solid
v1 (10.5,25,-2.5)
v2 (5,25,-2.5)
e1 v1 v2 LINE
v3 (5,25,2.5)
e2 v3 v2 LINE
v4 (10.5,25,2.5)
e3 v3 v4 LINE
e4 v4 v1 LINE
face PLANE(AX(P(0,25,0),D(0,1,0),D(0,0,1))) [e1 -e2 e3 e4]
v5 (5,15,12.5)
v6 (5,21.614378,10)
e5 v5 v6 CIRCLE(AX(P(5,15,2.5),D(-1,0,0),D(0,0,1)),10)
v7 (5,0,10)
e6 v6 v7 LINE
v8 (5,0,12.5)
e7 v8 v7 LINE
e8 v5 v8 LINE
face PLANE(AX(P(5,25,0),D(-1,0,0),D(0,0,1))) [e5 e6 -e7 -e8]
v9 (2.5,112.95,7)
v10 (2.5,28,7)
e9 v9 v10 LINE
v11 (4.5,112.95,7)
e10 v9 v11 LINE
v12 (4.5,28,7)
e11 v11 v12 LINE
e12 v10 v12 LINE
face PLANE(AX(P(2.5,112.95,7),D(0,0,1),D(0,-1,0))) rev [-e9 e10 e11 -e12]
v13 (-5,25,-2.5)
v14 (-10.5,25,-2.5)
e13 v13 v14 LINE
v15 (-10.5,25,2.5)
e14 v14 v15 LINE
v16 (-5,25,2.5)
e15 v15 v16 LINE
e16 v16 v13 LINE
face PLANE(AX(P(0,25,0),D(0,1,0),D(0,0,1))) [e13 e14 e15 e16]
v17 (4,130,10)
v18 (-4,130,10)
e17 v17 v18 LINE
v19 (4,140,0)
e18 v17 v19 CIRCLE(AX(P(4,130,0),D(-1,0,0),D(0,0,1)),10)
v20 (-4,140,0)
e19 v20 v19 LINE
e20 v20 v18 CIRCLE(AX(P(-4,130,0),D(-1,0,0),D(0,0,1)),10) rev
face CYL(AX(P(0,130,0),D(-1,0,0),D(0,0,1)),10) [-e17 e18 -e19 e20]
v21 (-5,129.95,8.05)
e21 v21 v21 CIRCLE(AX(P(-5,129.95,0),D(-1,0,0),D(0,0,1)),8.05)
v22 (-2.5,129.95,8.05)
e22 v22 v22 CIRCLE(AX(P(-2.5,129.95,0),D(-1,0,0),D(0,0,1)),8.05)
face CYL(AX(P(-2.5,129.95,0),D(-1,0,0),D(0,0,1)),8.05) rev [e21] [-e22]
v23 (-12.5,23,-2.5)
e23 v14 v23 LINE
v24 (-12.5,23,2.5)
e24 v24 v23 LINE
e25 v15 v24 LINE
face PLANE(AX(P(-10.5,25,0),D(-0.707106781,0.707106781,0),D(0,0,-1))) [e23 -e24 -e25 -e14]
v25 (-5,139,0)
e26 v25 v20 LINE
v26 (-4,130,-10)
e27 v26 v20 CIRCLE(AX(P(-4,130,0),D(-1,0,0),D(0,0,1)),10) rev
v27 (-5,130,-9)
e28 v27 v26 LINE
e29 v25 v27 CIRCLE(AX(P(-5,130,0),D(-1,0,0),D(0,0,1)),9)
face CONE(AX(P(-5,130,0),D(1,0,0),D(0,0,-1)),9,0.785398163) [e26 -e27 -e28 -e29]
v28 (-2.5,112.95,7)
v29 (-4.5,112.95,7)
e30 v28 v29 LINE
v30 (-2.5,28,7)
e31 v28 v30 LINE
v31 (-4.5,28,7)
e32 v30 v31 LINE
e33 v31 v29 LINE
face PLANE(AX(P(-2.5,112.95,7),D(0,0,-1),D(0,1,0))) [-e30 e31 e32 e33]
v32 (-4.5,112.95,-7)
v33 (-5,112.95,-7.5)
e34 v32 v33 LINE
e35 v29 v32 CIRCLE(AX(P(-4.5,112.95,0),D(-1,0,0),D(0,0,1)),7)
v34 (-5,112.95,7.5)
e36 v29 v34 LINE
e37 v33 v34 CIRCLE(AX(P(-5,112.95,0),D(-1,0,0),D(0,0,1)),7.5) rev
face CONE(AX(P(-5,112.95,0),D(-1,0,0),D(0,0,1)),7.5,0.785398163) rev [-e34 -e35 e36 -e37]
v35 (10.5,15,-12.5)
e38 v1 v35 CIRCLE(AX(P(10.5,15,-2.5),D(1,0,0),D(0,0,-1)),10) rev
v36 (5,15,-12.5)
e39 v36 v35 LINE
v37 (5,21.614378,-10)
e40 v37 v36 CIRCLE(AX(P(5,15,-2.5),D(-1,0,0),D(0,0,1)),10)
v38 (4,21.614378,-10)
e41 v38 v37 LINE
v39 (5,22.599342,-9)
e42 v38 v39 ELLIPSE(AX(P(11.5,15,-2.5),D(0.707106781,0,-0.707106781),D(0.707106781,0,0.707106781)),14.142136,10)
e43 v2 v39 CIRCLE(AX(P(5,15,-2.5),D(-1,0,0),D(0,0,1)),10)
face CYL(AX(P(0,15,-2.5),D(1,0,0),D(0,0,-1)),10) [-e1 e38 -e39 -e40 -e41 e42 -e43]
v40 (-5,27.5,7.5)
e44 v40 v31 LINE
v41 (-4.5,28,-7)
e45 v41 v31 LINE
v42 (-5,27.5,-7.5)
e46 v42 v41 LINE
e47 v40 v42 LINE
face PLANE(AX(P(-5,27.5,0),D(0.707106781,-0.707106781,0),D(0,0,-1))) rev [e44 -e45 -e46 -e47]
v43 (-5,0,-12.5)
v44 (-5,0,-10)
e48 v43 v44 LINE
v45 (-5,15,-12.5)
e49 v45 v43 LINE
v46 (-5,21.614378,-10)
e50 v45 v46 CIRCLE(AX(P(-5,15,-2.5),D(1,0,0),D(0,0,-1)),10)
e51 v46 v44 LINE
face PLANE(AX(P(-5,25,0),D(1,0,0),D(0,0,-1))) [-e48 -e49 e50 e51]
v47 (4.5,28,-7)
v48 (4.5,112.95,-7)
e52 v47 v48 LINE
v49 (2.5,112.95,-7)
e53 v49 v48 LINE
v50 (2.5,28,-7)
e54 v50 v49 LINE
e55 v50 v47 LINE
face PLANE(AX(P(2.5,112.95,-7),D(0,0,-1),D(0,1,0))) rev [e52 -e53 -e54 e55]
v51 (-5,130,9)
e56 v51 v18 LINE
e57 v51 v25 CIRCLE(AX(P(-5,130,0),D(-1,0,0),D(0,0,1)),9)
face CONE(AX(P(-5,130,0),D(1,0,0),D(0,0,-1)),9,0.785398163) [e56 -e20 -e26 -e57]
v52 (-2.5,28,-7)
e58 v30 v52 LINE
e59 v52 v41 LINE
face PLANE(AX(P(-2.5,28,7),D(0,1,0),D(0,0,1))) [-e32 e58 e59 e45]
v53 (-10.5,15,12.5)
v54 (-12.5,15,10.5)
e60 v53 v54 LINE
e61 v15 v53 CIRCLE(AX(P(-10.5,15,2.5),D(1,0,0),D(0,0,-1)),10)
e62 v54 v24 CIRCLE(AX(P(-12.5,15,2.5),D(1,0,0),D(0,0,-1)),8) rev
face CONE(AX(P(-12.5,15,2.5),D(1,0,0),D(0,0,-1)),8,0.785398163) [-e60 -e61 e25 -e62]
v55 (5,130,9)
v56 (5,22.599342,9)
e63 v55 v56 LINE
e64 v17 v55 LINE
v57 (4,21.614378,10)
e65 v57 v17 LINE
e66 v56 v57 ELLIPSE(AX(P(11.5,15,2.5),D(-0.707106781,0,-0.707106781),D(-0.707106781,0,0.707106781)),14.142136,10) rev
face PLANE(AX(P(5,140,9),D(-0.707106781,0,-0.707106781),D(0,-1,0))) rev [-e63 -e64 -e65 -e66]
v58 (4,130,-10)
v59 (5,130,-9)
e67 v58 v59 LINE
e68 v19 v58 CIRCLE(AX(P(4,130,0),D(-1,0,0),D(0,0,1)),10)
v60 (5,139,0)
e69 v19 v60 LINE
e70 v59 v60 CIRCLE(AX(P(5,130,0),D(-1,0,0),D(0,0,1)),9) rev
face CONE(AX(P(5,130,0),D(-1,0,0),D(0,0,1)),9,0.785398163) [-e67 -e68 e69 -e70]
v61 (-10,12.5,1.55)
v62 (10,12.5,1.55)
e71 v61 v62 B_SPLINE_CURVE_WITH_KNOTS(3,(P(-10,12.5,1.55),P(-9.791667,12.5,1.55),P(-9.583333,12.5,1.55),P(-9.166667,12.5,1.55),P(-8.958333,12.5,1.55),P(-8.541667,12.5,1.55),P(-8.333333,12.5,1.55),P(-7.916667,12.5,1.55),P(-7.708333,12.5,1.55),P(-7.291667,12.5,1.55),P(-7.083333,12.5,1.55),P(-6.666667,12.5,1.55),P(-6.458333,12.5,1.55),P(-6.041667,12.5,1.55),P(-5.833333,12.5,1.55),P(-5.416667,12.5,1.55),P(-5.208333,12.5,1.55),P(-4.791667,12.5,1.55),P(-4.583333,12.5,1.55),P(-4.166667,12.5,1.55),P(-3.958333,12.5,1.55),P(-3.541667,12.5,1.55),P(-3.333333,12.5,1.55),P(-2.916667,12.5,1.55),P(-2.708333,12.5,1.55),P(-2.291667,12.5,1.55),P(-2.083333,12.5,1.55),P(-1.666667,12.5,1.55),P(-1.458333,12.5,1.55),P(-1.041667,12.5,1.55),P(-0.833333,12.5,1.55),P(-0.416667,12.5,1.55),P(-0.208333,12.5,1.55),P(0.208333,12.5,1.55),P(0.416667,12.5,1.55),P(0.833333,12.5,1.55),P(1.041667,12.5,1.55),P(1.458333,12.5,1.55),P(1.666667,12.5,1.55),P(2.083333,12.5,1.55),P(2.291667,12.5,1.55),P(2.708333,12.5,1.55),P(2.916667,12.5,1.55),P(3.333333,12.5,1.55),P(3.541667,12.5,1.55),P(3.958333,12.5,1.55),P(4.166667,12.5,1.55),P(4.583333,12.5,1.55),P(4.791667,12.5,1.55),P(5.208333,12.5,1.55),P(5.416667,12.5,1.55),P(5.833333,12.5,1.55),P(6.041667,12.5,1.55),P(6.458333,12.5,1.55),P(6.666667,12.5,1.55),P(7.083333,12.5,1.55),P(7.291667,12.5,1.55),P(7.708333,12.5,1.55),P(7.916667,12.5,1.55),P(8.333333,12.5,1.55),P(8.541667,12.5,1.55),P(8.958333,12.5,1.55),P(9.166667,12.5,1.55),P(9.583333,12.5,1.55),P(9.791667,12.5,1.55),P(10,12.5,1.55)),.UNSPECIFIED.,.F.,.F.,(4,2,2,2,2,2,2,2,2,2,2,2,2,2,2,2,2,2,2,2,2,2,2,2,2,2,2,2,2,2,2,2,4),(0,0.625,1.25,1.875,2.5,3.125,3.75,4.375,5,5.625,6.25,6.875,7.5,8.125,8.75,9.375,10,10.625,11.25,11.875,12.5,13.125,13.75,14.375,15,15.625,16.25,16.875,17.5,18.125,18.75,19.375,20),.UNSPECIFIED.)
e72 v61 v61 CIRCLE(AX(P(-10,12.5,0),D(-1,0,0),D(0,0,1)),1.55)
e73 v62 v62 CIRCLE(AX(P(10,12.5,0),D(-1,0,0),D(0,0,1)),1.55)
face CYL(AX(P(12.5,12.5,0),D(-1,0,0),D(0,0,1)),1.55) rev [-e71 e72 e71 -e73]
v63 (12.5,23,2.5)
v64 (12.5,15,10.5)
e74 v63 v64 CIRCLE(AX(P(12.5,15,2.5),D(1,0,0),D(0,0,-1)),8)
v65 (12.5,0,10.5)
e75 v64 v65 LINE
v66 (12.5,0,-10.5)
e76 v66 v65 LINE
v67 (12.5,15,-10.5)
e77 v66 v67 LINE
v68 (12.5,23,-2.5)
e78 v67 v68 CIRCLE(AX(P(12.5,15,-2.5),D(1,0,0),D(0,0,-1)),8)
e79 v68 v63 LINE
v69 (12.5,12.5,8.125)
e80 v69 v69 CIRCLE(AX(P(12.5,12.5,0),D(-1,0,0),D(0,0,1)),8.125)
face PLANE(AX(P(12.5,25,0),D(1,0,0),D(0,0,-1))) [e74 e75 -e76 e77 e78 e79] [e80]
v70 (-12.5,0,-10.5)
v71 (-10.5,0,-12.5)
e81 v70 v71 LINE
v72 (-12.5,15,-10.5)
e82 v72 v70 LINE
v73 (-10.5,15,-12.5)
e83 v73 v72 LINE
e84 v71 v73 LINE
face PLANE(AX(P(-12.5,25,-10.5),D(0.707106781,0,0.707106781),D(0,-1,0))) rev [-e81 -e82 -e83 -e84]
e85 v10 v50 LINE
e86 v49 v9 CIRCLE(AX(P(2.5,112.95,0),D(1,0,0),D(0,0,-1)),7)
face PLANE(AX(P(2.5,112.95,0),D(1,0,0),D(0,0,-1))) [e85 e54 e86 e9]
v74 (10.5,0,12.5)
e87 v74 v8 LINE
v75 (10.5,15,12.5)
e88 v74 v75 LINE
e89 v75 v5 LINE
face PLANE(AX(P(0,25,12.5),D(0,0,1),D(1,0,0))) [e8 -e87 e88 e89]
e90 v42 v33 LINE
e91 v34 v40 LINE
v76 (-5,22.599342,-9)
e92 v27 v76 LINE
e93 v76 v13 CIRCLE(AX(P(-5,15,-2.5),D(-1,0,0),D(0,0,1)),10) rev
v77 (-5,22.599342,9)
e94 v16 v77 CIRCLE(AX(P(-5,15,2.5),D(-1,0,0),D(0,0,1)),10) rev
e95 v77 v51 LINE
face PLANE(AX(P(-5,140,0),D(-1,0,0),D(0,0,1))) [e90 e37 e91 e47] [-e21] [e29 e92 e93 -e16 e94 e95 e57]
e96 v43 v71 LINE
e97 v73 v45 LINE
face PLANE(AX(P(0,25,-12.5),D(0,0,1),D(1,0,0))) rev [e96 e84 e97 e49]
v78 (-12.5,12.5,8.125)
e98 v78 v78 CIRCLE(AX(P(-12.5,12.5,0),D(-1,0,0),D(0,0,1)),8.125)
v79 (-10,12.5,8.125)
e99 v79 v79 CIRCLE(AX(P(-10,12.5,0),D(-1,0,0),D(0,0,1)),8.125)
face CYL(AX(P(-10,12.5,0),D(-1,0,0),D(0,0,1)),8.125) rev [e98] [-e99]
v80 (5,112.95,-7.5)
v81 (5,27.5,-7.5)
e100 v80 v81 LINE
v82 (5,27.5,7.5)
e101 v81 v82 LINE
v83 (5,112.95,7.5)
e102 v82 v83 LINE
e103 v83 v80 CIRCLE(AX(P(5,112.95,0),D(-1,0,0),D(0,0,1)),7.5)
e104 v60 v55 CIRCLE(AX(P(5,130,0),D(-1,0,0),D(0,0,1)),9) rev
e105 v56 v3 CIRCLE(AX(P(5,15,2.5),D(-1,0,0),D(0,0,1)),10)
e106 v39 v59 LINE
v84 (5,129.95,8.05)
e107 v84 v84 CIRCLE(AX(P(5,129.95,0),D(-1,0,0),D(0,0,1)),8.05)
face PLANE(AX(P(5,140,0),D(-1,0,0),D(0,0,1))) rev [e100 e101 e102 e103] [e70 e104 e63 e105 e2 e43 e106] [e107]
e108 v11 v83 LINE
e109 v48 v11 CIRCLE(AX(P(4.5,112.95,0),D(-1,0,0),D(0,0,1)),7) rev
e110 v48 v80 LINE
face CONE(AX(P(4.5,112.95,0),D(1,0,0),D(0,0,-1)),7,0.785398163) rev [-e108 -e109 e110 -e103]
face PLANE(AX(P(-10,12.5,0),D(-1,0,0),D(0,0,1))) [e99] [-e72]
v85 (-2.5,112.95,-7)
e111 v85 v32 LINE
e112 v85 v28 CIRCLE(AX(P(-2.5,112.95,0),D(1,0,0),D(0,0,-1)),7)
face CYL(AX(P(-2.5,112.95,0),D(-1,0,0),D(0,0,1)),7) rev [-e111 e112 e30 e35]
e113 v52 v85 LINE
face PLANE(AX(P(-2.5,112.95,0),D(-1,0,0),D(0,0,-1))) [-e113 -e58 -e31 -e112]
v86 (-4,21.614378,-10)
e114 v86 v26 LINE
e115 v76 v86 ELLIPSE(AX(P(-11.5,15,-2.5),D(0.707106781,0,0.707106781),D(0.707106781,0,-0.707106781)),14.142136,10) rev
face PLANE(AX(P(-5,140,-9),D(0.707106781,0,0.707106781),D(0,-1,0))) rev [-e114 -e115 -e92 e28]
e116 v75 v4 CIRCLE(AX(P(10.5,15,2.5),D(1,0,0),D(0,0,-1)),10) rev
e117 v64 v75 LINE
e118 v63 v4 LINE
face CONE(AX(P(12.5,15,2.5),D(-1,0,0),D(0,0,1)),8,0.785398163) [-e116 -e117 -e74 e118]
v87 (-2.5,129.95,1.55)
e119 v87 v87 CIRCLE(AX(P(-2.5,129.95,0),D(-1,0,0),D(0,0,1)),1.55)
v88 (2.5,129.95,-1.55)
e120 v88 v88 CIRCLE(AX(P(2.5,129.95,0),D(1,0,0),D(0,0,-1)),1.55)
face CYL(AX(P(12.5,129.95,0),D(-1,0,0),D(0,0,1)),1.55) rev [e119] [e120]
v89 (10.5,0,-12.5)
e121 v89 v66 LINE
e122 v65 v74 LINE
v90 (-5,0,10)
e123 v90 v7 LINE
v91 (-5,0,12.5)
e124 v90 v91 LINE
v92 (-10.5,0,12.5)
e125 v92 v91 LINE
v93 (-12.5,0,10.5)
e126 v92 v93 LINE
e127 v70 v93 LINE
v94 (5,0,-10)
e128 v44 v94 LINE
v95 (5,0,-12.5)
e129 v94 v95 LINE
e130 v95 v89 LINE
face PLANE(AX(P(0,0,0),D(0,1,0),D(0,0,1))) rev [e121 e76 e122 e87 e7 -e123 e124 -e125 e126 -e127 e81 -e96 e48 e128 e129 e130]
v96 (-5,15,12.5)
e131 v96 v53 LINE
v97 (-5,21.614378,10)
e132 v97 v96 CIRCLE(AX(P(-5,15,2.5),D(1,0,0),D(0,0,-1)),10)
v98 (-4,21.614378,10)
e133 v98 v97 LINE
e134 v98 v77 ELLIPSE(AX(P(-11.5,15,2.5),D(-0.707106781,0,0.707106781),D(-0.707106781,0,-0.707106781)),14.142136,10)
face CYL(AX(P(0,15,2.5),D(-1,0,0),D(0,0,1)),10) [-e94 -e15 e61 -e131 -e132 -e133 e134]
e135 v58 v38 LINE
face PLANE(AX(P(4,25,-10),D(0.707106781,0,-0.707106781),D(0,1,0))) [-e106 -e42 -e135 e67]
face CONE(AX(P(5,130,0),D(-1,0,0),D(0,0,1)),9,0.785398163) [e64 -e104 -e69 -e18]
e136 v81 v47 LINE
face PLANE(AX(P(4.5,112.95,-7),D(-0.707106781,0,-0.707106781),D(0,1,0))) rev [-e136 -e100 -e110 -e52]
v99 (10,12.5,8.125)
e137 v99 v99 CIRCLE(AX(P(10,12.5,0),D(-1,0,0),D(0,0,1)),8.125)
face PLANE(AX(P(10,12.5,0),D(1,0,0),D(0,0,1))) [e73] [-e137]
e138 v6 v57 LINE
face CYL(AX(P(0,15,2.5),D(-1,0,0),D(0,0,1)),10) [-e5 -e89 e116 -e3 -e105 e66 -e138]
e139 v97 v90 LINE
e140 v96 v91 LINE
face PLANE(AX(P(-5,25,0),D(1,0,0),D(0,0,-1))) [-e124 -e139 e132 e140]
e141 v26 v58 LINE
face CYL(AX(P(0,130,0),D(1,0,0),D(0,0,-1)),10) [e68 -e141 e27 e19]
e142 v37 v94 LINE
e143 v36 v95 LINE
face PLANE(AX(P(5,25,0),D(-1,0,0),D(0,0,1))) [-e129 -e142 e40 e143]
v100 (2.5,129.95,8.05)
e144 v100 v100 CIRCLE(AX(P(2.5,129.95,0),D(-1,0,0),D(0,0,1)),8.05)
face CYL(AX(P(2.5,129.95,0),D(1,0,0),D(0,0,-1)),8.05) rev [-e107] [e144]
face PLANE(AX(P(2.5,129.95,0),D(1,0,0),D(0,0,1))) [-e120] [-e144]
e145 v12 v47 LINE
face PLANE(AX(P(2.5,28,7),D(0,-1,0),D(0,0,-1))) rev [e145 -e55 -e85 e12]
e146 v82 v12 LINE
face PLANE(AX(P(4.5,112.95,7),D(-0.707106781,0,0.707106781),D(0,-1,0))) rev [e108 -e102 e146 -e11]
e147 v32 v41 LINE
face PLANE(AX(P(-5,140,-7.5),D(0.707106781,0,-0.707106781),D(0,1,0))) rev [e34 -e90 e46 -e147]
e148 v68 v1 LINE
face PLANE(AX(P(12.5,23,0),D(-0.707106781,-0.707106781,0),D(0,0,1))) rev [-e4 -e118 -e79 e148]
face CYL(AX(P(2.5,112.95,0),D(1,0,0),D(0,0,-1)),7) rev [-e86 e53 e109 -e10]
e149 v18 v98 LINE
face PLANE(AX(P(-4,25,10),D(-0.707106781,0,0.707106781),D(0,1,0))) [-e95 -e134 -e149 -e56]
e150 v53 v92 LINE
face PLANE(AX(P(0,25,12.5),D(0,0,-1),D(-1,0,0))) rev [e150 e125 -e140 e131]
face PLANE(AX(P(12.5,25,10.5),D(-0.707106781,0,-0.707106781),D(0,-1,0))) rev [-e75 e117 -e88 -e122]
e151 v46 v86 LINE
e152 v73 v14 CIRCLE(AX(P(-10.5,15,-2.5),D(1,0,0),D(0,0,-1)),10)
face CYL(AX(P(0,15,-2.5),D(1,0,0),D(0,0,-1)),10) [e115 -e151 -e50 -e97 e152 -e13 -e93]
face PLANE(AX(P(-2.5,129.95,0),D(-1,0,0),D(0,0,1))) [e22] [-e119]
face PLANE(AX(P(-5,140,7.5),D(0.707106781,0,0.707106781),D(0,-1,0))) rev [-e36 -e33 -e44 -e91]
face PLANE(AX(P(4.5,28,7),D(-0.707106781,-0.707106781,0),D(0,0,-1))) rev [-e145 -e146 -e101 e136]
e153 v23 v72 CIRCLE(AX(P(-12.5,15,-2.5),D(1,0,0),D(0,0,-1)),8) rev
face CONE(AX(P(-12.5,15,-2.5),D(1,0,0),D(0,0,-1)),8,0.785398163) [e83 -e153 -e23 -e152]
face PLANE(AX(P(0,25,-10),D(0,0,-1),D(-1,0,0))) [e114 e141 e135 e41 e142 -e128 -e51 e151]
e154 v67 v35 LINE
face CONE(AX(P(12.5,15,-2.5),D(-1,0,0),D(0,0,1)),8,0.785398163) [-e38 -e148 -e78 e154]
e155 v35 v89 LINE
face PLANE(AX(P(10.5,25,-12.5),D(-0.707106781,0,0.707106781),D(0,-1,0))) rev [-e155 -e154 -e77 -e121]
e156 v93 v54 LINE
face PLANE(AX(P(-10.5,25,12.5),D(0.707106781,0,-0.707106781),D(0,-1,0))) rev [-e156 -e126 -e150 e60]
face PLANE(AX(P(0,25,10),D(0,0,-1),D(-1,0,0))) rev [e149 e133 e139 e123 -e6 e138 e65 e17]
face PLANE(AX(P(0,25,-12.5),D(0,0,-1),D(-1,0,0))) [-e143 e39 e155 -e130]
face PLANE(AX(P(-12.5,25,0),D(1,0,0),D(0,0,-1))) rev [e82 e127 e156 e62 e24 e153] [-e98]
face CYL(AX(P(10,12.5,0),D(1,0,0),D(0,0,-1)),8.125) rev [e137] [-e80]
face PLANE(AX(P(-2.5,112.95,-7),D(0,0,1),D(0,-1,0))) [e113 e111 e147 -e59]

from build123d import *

# Parameters (mm, degrees)
BASE_W              = 10
BASE_H              = 20
BOSS_EXTRUDE1_DEPTH = 25
SKETCH2_R           = 8.125
SKETCH2_R_2         = 1.55
CUT_EXTRUDE1_DEPTH  = 2.5
SKETCH2_2_R         = 1.55
CUT_EXTRUDE2_DEPTH  = 38.5
BOSS_EXTRUDE2_START = 25
BASE_3_W            = 10
BASE_3_H            = 20
BOSS_EXTRUDE2_DEPTH = 115
BEARING_R           = 8.05
BEARING_R_2         = 1.55
CUT_EXTRUDE3_DEPTH  = 2.5
FILLET1_R           = 10
CHAMFER1_SIZE       = 2
CUT_EXTRUDE5_DEPTH  = 2.5
BEARING_2_R         = 1.55
CUT_EXTRUDE6_DEPTH  = 142.642154742
CHAMFER2_SIZE       = 1
CHAMFER3_SIZE       = 0.5


with BuildPart() as part:
    # Base → Boss-Extrude1 (new body)
    with BuildSketch(Plane(origin=(0, 0, 0), x_dir=(1, 0, 0), z_dir=(0, 1, 0))):
        Polygon((5, -12.5), (5, -10), (5, 10), (5, 12.5), (12.5, 12.5), (12.5, -12.5), align=None)
        Rectangle(BASE_W, BASE_H)
        Polygon((-5, 10), (-5, -10), (-5, -12.5), (-12.5, -12.5), (-12.5, 12.5), (-5, 12.5), align=None)
    extrude(amount=BOSS_EXTRUDE1_DEPTH)

    # Sketch2 → Cut-Extrude1 (cut)
    with BuildSketch(Plane.ZY.offset(12.5)):
        with Locations((0, 12.5)):
            Circle(SKETCH2_R)
        with Locations((0, 12.5)):
            Circle(SKETCH2_R_2, mode=Mode.SUBTRACT)
    cut_extrude1 = extrude(amount=-CUT_EXTRUDE1_DEPTH, mode=Mode.SUBTRACT)

    # Sketch2<2> → Cut-Extrude2 (cut, through all)
    with BuildSketch(Plane.ZY.offset(12.5)):
        with Locations((0, 12.5)):
            Circle(SKETCH2_2_R)
    extrude(amount=-CUT_EXTRUDE2_DEPTH, mode=Mode.SUBTRACT)

    # Base<3> → Boss-Extrude2 (add)
    with BuildSketch(Plane(origin=(0, 0, 0), x_dir=(1, 0, 0), z_dir=(0, 1, 0)).offset(BOSS_EXTRUDE2_START)):
        Rectangle(BASE_3_W, BASE_3_H)
    extrude(amount=BOSS_EXTRUDE2_DEPTH)

    # Mirror1: Cut-Extrude1 across plane
    add(cut_extrude1.mirror(Plane.ZY), mode=Mode.SUBTRACT)

    # Bearing → Cut-Extrude3 (cut)
    with BuildSketch(Plane.ZY.offset(5)):
        with Locations((0, 129.95)):
            Circle(BEARING_R)
        with Locations((0, 129.95)):
            Circle(BEARING_R_2, mode=Mode.SUBTRACT)
    cut_extrude3 = extrude(amount=-CUT_EXTRUDE3_DEPTH, mode=Mode.SUBTRACT)

    # Fillet1
    # the kernel refuses this fillet: 10 mm, written as the material it takes off along each edge
    with BuildSketch(Plane(origin=(37.5, 25, 12.5), x_dir=(0, -1, 0), z_dir=(-1, 0, 0)), Plane(origin=(5, 25, -12.5), x_dir=(0, -1, 0), z_dir=(1, 0, 0))) as fillet1_piece_1:
        with BuildLine():
            CenterArc((FILLET1_R, -FILLET1_R), FILLET1_R, 90, 90)
            Line((0, -FILLET1_R), (0, 0))
            Line((0, 0), (FILLET1_R, 0))
        make_face()
    extrude(amount=32.5, mode=Mode.SUBTRACT)
    with BuildSketch(Plane(origin=(37.5, 25, 12.5), x_dir=(0, -1, 0), z_dir=(-1, 0, 0))) as fillet1_piece_2_section:
        with BuildLine():
            CenterArc((FILLET1_R, -FILLET1_R), FILLET1_R, 90, 90)
            Line((0, -FILLET1_R), (0, 0))
            Line((0, 0), (FILLET1_R, 0))
        make_face()
    fillet1_piece_2 = extrude(amount=57.5, mode=Mode.PRIVATE)
    fillet1_piece_2 = split(fillet1_piece_2, bisect_by=Plane(origin=(-5, 22.736048857, 10.236048857), z_dir=(-1, 0, 0)), keep=Keep.TOP, mode=Mode.PRIVATE)
    add(fillet1_piece_2, mode=Mode.SUBTRACT)
    with BuildSketch(Plane(origin=(-20, 25, -12.5), x_dir=(0, -1, 0), z_dir=(1, 0, 0))) as fillet1_piece_3_section:
        with BuildLine():
            CenterArc((FILLET1_R, -FILLET1_R), FILLET1_R, 90, 90)
            Line((0, -FILLET1_R), (0, 0))
            Line((0, 0), (FILLET1_R, 0))
        make_face()
    fillet1_piece_3 = extrude(amount=57.5, mode=Mode.PRIVATE)
    fillet1_piece_3 = split(fillet1_piece_3, bisect_by=Plane(origin=(-5, 22.736048857, -10.236048857), z_dir=(-1, 0, 0)), keep=Keep.TOP, mode=Mode.PRIVATE)
    add(fillet1_piece_3, mode=Mode.SUBTRACT)
    with BuildSketch(Plane(origin=(-37.5, 25, -12.5), x_dir=(0, 0, 1), z_dir=(1, 0, 0)), Plane(origin=(-5, 25, 12.5), x_dir=(0, 0, -1), z_dir=(-1, 0, 0))) as fillet1_piece_4:
        with BuildLine():
            CenterArc((FILLET1_R, FILLET1_R), FILLET1_R, 180, 90)
            Line((0, FILLET1_R), (0, 0))
            Line((0, 0), (FILLET1_R, 0))
        make_face()
    extrude(amount=32.5, mode=Mode.SUBTRACT)
    with BuildSketch(Plane(origin=(-37.5, 25, -12.5), x_dir=(0, 0, 1), z_dir=(1, 0, 0))) as fillet1_piece_5_section:
        with BuildLine():
            CenterArc((FILLET1_R, FILLET1_R), FILLET1_R, 180, 90)
            Line((0, FILLET1_R), (0, 0))
            Line((0, 0), (FILLET1_R, 0))
        make_face()
    fillet1_piece_5 = extrude(amount=57.5, mode=Mode.PRIVATE)
    fillet1_piece_5 = split(fillet1_piece_5, bisect_by=Plane(origin=(5, 22.736048857, -10.236048857), z_dir=(1, 0, 0)), keep=Keep.TOP, mode=Mode.PRIVATE)
    add(fillet1_piece_5, mode=Mode.SUBTRACT)
    with BuildSketch(Plane(origin=(20, 25, 12.5), x_dir=(0, 0, -1), z_dir=(-1, 0, 0))) as fillet1_piece_6_section:
        with BuildLine():
            CenterArc((FILLET1_R, FILLET1_R), FILLET1_R, 180, 90)
            Line((0, FILLET1_R), (0, 0))
            Line((0, 0), (FILLET1_R, 0))
        make_face()
    fillet1_piece_6 = extrude(amount=57.5, mode=Mode.PRIVATE)
    fillet1_piece_6 = split(fillet1_piece_6, bisect_by=Plane(origin=(5, 22.736048857, 10.236048857), z_dir=(1, 0, 0)), keep=Keep.TOP, mode=Mode.PRIVATE)
    add(fillet1_piece_6, mode=Mode.SUBTRACT)
    with BuildSketch(Plane(origin=(30, 140, 10), x_dir=(0, -1, 0), z_dir=(-1, 0, 0)), Plane(origin=(-30, 140, -10), x_dir=(0, -1, 0), z_dir=(1, 0, 0))) as fillet1_piece_7:
        with BuildLine():
            CenterArc((FILLET1_R, -FILLET1_R), FILLET1_R, 90, 90)
            Line((0, -FILLET1_R), (0, 0))
            Line((0, 0), (FILLET1_R, 0))
        make_face()
    extrude(amount=60, mode=Mode.SUBTRACT)

    # Chamfer1
    chamfer1_edges = [part.edges().sort_by_distance(p)[0] for p in [
        (12.5, 7.5, -12.5),
        (12.5, 25, 0),
        (12.5, 7.5, 12.5),
        (12.5, 22.071067812, 9.571067812),
        (12.5, 22.071067812, -9.571067812),
        (-12.5, 25, 0),
        (-12.5, 7.5, 12.5),
        (-12.5, 7.5, -12.5),
        (-12.5, 22.071067812, 9.571067812),
        (-12.5, 22.071067812, -9.571067812),
    ]]
    chamfer(chamfer1_edges, length=CHAMFER1_SIZE)

    # Sketch4 → Cut-Extrude5 (cut)
    with BuildSketch(Plane(origin=(5, 0, 0), x_dir=(0, 0, -1), z_dir=(1, 0, 0))):
        with BuildLine():
            Line((-7, 28), (7, 28))
            Line((7, 28), (7, 112.95))
            ThreePointArc((7, 112.95), (0, 119.95), (-7, 112.95))
            Line((-7, 112.95), (-7, 28))
        make_face()
    cut_extrude5 = extrude(amount=-CUT_EXTRUDE5_DEPTH, mode=Mode.SUBTRACT)

    # Mirror2: Cut-Extrude3, Cut-Extrude5 across plane
    add(cut_extrude3.mirror(Plane.ZY), mode=Mode.SUBTRACT)
    add(cut_extrude5.mirror(Plane.ZY), mode=Mode.SUBTRACT)

    # Bearing<2> → Cut-Extrude6 (cut, through all)
    with BuildSketch(Plane.ZY.offset(5)):
        with Locations((0, 129.95)):
            Circle(BEARING_2_R)
    extrude(amount=-CUT_EXTRUDE6_DEPTH, mode=Mode.SUBTRACT)

    # Chamfer2
    chamfer2_edges = [part.edges().sort_by_distance(p)[0] for p in [
        (5, 140, 0),
        (5, 140, 0),
        (5, 75.807189139, 10),
        (-5, 75.807189139, 10),
        (-5, 75.807189139, -10),
        (5, 75.807189139, -10),
        (-5, 140, 0),
        (-5, 140, 0),
    ]]
    chamfer(chamfer2_edges, length=CHAMFER2_SIZE)

    # Chamfer3
    chamfer3_edges = [part.edges().sort_by_distance(p)[0] for p in [
        (5, 119.95, 0),
        (5, 70.475, 7),
        (5, 28, 0),
        (5, 70.475, -7),
        (-5, 119.95, 0),
        (-5, 70.475, 7),
        (-5, 28, 0),
        (-5, 70.475, -7),
    ]]
    chamfer(chamfer3_edges, length=CHAMFER3_SIZE)


solid = part.part
